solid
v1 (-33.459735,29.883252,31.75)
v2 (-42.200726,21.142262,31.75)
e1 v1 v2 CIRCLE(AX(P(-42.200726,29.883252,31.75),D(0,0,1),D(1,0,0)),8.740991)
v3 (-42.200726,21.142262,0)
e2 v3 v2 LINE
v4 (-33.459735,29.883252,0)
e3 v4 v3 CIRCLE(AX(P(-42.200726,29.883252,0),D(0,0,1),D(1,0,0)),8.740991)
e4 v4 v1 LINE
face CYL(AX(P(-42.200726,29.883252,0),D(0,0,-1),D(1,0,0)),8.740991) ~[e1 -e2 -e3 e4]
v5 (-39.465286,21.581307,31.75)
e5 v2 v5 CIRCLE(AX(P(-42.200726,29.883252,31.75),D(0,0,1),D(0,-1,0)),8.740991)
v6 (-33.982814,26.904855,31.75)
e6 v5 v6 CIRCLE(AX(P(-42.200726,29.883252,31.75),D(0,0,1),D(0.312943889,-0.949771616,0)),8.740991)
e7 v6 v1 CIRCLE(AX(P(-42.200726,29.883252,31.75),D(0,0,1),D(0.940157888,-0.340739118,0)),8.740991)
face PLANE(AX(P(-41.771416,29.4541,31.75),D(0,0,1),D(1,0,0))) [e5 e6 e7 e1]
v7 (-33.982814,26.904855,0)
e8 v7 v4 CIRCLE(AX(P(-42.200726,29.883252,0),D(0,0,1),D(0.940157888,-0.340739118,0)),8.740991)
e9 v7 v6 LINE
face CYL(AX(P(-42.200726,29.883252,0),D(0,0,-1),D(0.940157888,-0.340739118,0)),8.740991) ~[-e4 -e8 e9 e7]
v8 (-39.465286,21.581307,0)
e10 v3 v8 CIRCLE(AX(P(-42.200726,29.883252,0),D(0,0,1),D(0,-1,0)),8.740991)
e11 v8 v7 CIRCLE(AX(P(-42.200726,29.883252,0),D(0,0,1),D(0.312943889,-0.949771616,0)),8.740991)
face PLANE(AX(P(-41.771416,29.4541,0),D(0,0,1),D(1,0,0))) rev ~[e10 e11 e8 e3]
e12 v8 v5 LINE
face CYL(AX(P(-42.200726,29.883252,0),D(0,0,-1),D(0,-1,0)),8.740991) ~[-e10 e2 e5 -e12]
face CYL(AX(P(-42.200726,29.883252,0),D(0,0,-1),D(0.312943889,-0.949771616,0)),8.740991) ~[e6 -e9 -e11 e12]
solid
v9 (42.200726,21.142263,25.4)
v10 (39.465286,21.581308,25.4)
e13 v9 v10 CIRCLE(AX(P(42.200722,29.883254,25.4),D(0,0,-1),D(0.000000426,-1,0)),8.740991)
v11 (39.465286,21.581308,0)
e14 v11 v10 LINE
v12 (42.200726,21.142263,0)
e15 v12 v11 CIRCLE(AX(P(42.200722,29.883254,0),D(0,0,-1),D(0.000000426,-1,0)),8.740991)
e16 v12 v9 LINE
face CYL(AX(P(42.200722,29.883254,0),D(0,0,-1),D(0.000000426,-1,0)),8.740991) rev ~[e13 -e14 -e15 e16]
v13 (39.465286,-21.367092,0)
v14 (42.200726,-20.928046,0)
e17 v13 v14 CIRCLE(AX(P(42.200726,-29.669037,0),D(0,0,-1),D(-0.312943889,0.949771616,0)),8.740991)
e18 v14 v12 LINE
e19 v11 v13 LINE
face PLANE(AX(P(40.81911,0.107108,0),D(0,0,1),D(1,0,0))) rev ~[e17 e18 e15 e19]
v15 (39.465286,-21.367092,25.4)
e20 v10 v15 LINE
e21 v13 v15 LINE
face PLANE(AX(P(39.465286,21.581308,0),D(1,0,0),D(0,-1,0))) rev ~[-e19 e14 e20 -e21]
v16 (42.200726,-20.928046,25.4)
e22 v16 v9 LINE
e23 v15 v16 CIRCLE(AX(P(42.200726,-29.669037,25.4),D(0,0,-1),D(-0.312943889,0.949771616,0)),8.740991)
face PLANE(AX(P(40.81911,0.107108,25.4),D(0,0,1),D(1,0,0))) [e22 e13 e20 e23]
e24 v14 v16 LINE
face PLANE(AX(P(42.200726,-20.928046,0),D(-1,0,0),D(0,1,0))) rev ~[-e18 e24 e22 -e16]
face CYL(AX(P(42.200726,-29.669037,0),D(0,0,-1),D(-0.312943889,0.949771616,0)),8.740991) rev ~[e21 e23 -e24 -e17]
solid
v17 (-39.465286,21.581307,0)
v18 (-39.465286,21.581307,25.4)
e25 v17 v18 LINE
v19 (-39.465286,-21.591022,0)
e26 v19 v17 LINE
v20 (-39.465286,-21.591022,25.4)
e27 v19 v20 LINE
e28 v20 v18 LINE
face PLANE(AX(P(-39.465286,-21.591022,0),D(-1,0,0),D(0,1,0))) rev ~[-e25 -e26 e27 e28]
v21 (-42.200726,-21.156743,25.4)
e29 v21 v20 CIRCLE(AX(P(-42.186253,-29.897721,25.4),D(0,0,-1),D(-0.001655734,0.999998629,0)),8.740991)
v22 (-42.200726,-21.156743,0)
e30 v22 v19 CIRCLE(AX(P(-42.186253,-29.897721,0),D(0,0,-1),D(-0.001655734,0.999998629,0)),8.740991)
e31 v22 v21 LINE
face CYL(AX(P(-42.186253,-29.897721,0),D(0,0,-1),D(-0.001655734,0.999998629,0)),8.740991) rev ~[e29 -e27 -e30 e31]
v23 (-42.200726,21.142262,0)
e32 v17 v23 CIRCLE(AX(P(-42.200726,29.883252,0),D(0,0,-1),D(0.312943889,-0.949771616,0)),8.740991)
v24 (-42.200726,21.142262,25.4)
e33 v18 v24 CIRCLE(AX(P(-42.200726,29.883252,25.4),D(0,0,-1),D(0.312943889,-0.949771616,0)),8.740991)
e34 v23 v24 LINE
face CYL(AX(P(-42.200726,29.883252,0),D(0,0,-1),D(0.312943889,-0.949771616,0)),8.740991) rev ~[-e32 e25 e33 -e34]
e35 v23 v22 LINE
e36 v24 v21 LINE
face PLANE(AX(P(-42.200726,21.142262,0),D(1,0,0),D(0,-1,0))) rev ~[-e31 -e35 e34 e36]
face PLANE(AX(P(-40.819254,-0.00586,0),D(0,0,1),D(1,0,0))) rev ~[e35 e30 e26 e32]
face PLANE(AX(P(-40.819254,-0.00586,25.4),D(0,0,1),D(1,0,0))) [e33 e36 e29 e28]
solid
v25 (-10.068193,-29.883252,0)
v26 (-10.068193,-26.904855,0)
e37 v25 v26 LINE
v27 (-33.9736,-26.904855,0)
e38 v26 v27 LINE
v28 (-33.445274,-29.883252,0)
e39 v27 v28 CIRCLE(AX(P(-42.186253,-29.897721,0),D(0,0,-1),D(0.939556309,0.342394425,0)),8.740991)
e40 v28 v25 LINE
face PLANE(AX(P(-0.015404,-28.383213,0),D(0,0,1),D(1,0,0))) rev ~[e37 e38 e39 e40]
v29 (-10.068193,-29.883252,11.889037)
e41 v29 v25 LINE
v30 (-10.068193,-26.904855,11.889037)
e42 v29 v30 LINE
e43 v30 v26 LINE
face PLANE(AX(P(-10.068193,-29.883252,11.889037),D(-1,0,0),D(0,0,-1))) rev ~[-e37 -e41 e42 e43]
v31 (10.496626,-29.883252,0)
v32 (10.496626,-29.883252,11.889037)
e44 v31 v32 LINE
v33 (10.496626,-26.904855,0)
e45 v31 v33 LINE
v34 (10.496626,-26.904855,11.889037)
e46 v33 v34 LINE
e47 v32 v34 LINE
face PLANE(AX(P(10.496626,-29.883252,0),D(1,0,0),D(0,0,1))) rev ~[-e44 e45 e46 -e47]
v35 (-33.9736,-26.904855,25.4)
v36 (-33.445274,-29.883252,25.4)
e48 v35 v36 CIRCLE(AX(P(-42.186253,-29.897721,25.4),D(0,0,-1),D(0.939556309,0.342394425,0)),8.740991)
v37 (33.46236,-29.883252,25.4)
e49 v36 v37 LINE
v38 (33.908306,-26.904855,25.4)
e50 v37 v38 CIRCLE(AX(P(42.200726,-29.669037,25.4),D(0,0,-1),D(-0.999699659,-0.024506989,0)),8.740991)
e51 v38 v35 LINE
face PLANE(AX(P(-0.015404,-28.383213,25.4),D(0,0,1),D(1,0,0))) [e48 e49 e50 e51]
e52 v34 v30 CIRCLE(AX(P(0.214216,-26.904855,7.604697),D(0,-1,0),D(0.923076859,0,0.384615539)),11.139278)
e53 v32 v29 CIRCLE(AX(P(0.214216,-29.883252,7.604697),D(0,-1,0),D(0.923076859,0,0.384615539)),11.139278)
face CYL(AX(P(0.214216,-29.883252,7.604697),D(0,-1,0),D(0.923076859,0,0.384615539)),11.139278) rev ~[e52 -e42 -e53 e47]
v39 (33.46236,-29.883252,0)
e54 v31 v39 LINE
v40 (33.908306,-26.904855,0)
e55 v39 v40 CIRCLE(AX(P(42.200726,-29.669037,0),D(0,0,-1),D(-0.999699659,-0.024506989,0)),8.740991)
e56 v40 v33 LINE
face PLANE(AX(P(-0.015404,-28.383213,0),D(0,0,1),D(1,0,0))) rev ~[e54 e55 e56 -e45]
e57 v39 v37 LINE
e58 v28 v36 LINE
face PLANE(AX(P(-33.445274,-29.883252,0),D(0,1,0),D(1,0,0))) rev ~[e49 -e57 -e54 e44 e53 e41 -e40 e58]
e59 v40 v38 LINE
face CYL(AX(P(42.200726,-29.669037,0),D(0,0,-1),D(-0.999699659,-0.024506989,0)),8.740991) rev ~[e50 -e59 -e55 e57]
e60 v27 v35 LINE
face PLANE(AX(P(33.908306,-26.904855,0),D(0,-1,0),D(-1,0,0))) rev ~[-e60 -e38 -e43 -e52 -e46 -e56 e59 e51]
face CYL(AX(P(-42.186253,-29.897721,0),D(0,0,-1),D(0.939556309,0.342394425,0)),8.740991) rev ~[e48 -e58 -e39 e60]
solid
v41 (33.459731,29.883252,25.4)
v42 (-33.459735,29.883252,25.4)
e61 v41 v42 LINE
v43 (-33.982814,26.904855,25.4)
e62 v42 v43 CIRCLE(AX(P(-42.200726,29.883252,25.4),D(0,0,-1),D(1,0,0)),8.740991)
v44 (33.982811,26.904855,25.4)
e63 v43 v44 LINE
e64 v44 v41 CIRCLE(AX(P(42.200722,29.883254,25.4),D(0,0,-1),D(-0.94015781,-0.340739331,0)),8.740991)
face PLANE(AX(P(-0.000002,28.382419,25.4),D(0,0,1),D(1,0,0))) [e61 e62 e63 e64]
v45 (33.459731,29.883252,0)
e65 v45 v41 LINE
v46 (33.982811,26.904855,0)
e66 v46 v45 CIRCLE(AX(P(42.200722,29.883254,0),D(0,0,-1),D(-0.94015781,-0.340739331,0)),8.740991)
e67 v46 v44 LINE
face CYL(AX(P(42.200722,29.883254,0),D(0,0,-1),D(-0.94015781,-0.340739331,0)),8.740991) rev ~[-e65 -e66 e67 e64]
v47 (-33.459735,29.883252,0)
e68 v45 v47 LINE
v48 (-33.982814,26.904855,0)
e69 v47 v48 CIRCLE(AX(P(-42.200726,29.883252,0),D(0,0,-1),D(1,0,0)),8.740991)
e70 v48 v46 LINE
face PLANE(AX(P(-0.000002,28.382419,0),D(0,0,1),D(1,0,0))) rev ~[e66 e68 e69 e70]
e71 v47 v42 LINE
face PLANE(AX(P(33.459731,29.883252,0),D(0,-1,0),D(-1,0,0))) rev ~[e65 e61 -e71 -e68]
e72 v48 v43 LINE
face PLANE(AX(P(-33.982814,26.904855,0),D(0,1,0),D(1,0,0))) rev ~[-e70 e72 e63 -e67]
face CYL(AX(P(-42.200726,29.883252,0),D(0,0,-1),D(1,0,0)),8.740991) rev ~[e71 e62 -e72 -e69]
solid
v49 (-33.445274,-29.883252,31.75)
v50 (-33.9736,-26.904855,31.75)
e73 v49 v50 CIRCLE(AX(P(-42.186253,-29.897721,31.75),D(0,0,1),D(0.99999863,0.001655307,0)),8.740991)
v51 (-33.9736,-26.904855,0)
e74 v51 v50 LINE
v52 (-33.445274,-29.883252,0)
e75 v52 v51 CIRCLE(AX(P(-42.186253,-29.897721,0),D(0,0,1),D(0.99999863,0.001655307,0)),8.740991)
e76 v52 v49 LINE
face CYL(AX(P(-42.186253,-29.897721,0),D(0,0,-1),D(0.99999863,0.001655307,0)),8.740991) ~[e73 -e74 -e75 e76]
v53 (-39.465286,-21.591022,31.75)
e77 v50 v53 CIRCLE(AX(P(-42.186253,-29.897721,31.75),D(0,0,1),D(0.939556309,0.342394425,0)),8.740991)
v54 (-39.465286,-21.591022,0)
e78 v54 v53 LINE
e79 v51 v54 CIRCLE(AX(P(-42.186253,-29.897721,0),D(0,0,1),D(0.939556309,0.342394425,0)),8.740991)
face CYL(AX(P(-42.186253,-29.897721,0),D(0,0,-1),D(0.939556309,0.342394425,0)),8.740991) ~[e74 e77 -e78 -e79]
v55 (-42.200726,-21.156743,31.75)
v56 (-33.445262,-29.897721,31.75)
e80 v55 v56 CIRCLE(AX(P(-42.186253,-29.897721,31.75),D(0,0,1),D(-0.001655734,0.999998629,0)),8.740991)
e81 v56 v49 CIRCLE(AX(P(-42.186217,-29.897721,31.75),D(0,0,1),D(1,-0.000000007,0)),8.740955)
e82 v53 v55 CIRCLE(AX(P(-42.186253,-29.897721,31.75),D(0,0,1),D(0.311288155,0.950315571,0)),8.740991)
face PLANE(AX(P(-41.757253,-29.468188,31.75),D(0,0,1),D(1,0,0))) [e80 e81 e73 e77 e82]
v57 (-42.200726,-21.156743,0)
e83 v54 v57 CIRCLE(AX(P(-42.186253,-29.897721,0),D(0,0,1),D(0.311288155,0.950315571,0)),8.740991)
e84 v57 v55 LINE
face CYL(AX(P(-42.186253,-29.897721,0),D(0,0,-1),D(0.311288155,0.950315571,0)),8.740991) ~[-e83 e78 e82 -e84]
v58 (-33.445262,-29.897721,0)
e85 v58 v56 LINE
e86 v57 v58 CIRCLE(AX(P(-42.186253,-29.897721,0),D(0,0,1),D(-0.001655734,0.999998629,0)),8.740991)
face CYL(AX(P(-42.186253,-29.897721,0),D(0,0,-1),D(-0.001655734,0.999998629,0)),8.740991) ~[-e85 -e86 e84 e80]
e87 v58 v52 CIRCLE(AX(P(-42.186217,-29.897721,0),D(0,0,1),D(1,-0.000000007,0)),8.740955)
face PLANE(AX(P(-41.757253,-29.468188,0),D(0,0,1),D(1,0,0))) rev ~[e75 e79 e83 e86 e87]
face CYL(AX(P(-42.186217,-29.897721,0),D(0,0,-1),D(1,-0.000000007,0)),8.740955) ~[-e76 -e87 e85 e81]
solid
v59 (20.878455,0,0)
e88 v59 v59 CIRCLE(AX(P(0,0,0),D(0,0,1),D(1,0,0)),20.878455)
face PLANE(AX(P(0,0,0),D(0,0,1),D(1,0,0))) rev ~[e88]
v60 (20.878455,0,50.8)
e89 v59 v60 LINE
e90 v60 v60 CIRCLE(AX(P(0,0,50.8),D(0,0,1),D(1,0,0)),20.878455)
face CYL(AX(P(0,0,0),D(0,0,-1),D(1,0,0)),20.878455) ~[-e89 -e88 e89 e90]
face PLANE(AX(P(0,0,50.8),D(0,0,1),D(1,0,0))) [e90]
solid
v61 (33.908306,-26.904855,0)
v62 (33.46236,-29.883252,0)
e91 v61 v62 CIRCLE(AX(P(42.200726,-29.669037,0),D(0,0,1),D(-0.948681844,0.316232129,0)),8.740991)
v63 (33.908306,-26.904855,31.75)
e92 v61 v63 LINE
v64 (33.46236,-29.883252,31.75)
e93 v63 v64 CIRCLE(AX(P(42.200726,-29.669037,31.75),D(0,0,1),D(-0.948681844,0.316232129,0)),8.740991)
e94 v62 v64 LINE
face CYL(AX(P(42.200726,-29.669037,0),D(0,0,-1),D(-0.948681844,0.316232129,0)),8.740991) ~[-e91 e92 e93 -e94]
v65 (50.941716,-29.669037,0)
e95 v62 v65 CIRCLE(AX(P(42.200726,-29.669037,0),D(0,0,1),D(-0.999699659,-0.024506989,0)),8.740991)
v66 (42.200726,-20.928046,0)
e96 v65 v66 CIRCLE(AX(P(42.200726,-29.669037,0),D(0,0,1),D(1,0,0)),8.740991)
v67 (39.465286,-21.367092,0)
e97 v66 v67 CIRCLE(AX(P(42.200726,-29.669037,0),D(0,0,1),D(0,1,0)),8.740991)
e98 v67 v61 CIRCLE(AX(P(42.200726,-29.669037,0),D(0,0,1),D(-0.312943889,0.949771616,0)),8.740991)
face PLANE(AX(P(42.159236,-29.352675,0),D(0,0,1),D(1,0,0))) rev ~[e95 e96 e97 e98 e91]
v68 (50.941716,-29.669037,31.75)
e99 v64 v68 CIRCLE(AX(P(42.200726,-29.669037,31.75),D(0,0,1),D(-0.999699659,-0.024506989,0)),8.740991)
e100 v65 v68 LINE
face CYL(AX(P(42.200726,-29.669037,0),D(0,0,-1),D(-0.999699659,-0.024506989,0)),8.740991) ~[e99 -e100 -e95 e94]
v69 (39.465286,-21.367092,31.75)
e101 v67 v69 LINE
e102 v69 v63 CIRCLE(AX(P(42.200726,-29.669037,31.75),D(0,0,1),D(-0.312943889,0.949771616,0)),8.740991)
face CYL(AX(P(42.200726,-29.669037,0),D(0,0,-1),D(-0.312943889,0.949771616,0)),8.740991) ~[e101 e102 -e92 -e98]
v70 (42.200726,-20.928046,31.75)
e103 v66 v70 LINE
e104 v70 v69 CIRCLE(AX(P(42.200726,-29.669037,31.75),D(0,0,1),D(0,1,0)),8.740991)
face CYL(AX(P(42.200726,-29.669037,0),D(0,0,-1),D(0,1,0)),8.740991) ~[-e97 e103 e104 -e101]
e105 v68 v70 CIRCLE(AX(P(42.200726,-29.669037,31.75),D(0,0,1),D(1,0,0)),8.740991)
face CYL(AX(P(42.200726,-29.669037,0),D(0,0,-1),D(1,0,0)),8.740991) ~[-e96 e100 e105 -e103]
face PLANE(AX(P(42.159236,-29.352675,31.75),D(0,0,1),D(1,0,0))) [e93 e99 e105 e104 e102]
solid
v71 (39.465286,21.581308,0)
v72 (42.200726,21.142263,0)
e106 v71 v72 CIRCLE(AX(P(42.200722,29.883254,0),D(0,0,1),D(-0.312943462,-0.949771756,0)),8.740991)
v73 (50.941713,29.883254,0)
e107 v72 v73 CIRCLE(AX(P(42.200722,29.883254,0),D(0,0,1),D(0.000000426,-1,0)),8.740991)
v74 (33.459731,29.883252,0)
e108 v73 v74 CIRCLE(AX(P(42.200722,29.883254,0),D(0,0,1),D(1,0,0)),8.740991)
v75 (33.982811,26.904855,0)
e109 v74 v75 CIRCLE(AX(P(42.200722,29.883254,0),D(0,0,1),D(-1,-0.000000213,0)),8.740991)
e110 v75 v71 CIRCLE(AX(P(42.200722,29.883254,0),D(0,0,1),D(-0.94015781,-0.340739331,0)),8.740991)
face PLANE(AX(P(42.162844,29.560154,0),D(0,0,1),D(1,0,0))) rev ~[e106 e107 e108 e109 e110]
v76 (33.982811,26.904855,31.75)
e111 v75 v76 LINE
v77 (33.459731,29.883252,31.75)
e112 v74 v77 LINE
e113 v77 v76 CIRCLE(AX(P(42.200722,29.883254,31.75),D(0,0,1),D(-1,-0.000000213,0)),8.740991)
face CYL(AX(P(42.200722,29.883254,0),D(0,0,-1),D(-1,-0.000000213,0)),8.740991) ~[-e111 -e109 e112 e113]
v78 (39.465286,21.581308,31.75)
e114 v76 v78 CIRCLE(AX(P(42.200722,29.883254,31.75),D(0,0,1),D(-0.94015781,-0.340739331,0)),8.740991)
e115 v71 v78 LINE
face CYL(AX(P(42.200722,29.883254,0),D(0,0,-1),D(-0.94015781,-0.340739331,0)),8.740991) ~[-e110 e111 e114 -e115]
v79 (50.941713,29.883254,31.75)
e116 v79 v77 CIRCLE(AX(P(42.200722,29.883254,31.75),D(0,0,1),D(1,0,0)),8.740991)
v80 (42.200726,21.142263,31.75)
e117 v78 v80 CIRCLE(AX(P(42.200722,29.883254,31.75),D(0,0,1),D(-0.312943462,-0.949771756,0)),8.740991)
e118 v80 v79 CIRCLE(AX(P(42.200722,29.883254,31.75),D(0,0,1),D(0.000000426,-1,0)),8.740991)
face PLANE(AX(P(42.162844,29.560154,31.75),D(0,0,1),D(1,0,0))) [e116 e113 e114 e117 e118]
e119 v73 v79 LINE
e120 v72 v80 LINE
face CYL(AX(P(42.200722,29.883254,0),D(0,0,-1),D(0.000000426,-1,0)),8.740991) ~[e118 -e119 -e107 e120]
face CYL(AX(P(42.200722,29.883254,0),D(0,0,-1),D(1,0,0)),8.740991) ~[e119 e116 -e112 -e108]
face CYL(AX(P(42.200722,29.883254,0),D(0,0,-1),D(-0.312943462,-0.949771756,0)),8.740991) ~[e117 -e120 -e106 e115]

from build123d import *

# Parameters (mm, degrees)
F1_DEPTH = 25.4
F2_DEPTH = 31.75
F0_R     = 20.8784550172
F3_DEPTH = 50.8
F5_DEPTH = 25.4


with BuildPart() as f1:
    # F0 (on Top) → F1 (new body)
    with BuildSketch(Plane.XY):
        with BuildLine():
            ThreePointArc((33.9828109176, 26.9048549235), (33.5914941612, 28.3712616954), (33.4597308818, 29.8832524568))
            Line((33.4597308818, 29.8832524568), (-33.4597346071, 29.8832524568))
            ThreePointArc((-33.4597346071, 29.8832524568), (-33.591497554, 28.3712617257), (-33.9828139678, 26.9048549235))
            Line((-33.9828139678, 26.9048549235), (33.9828109176, 26.9048549235))
        make_face()
    extrude(amount=F1_DEPTH)


with BuildPart() as f1b:
    # F0 (on Top) → F1, piece 2 (new body)
    with BuildSketch(Plane.XY):
        with BuildLine():
            ThreePointArc((-39.4652858377, 21.5813073864), (-40.8155006753, 21.2527209348), (-42.2007255256, 21.1422615383))
            Line((-42.2007255256, 21.1422615383), (-42.2007255256, -21.1567425473))
            ThreePointArc((-42.2007255256, -21.1567425473), (-40.8156954821, -21.2648485586), (-39.4652858377, -21.5910217079))
            Line((-39.4652858377, -21.5910217079), (-39.4652858377, 21.5813073864))
        make_face()
    extrude(amount=F1_DEPTH)


with BuildPart() as f1c:
    # F0 (on Top) → F1, piece 3 (new body)
    with BuildSketch(Plane.XY):
        with BuildLine():
            Line((42.2007255256, -20.9280461702), (42.2007255256, 21.1422634009))
            ThreePointArc((42.2007255256, 21.1422634009), (40.8155007255, 21.2527221915), (39.4652858377, 21.5813080216))
            Line((39.4652858377, 21.5813080216), (39.4652858377, -21.3670920184))
            ThreePointArc((39.4652858377, -21.3670920184), (40.8155006753, -21.0385055668), (42.2007255256, -20.9280461702))
        make_face()
    extrude(amount=F1_DEPTH)


with BuildPart() as f1d:
    # F0 (on Top) → F1, piece 4 (new body)
    with BuildSketch(Plane.XY):
        with BuildLine():
            ThreePointArc((33.4623598882, -29.8832524568), (33.5560958311, -28.3747034059), (33.9083061443, -26.9048549235))
            Line((33.9083061443, -26.9048549235), (-33.9735996091, -26.9048549235))
            ThreePointArc((-33.9735996091, -26.9048549235), (-33.5796202507, -28.3710260767), (-33.4452738296, -29.8832524568))
            Line((-33.4452738296, -29.8832524568), (33.4623598882, -29.8832524568))
        make_face()
    extrude(amount=F1_DEPTH)

    # F4 (on face) → F5 (cut)
    with BuildSketch(Plane.XZ.offset(29.8832524568)):
        with BuildLine():
            Line((-10.068193078, 11.8890367448), (-10.068193078, 0))
            Line((-10.068193078, 0), (10.4966256768, 0))
            Line((10.4966256768, 0), (10.4966256768, 11.8890367448))
            ThreePointArc((10.4966256768, 11.8890367448), (0.2142162994, 18.743975088), (-10.068193078, 11.8890367448))
        make_face()
    extrude(amount=-F5_DEPTH, mode=Mode.SUBTRACT)


with BuildPart() as f2:
    # F0 (on Top) → F2 (new body)
    with BuildSketch(Plane.XY):
        with BuildLine():
            ThreePointArc((-33.9828139678, 26.9048549235), (-33.591497554, 28.3712617257), (-33.4597346071, 29.8832524568))
            ThreePointArc((-33.4597346071, 29.8832524568), (-48.3815394784, 36.0640664096), (-42.2007255256, 21.1422615383))
            ThreePointArc((-42.2007255256, 21.1422615383), (-40.8155006753, 21.2527209348), (-39.4652858377, 21.5813073864))
            ThreePointArc((-39.4652858377, 21.5813073864), (-36.1114714274, 23.6122153205), (-33.9828139678, 26.9048549235))
        make_face()
    extrude(amount=F2_DEPTH)


with BuildPart() as f2b:
    # F0 (on Top) → F2, piece 2 (new body)
    with BuildSketch(Plane.XY):
        with BuildLine():
            ThreePointArc((50.9417127189, 29.8832543194), (42.200720869, 38.624245238), (33.4597308818, 29.8832524568))
            ThreePointArc((33.4597308818, 29.8832524568), (33.5914941612, 28.3712616954), (33.9828109176, 26.9048549235))
            ThreePointArc((33.9828109176, 26.9048549235), (36.1114698198, 23.6122151269), (39.4652858377, 21.5813080216))
            ThreePointArc((39.4652858377, 21.5813080216), (40.8155007255, 21.2527221915), (42.2007255256, 21.1422634009))
            ThreePointArc((42.2007255256, 21.1422634009), (48.3815370702, 23.7024416837), (50.9417127189, 29.8832543194))
        make_face()
    extrude(amount=F2_DEPTH)


with BuildPart() as f2c:
    # F0 (on Top) → F2, piece 3 (new body)
    with BuildSketch(Plane.XY):
        with BuildLine():
            ThreePointArc((50.9417164441, -29.6690370888), (48.3815394784, -23.488223136), (42.2007255256, -20.9280461702))
            ThreePointArc((42.2007255256, -20.9280461702), (40.8155006753, -21.0385055668), (39.4652858377, -21.3670920184))
            ThreePointArc((39.4652858377, -21.3670920184), (36.0306263845, -23.4775268669), (33.9083061443, -26.9048549235))
            ThreePointArc((33.9083061443, -26.9048549235), (33.5560958311, -28.3747034059), (33.4623598882, -29.8832524568))
            ThreePointArc((33.4623598882, -29.8832524568), (42.3078412528, -38.4093716624), (50.9417164441, -29.6690370888))
        make_face()
    extrude(amount=F2_DEPTH)


with BuildPart() as f2d:
    # F0 (on Top) → F2, piece 4 (new body)
    with BuildSketch(Plane.XY):
        with BuildLine():
            ThreePointArc((-39.4652858377, -21.5910217079), (-40.8156954821, -21.2648485586), (-42.2007255256, -21.1567425473))
            ThreePointArc((-42.2007255256, -21.1567425473), (-48.361947715, -36.0836502116), (-33.4452618543, -29.8977214843))
            ThreePointArc((-33.4452618543, -29.8977214843), (-33.4452648481, -29.8904869681), (-33.4452738296, -29.8832524568))
            ThreePointArc((-33.4452738296, -29.8832524568), (-33.5796202507, -28.3710260767), (-33.9735996091, -26.9048549235))
            ThreePointArc((-33.9735996091, -26.9048549235), (-36.1079949651, -23.6160255142), (-39.4652858377, -21.5910217079))
        make_face()
    extrude(amount=F2_DEPTH)


with BuildPart() as f3:
    # F0 (on Top) → F3 (new body)
    with BuildSketch(Plane.XY):
        Circle(F0_R)
    extrude(amount=F3_DEPTH)


solid = Compound([f1.part, f1b.part, f1c.part, f1d.part, f2.part, f2b.part, f2c.part, f2d.part, f3.part])
